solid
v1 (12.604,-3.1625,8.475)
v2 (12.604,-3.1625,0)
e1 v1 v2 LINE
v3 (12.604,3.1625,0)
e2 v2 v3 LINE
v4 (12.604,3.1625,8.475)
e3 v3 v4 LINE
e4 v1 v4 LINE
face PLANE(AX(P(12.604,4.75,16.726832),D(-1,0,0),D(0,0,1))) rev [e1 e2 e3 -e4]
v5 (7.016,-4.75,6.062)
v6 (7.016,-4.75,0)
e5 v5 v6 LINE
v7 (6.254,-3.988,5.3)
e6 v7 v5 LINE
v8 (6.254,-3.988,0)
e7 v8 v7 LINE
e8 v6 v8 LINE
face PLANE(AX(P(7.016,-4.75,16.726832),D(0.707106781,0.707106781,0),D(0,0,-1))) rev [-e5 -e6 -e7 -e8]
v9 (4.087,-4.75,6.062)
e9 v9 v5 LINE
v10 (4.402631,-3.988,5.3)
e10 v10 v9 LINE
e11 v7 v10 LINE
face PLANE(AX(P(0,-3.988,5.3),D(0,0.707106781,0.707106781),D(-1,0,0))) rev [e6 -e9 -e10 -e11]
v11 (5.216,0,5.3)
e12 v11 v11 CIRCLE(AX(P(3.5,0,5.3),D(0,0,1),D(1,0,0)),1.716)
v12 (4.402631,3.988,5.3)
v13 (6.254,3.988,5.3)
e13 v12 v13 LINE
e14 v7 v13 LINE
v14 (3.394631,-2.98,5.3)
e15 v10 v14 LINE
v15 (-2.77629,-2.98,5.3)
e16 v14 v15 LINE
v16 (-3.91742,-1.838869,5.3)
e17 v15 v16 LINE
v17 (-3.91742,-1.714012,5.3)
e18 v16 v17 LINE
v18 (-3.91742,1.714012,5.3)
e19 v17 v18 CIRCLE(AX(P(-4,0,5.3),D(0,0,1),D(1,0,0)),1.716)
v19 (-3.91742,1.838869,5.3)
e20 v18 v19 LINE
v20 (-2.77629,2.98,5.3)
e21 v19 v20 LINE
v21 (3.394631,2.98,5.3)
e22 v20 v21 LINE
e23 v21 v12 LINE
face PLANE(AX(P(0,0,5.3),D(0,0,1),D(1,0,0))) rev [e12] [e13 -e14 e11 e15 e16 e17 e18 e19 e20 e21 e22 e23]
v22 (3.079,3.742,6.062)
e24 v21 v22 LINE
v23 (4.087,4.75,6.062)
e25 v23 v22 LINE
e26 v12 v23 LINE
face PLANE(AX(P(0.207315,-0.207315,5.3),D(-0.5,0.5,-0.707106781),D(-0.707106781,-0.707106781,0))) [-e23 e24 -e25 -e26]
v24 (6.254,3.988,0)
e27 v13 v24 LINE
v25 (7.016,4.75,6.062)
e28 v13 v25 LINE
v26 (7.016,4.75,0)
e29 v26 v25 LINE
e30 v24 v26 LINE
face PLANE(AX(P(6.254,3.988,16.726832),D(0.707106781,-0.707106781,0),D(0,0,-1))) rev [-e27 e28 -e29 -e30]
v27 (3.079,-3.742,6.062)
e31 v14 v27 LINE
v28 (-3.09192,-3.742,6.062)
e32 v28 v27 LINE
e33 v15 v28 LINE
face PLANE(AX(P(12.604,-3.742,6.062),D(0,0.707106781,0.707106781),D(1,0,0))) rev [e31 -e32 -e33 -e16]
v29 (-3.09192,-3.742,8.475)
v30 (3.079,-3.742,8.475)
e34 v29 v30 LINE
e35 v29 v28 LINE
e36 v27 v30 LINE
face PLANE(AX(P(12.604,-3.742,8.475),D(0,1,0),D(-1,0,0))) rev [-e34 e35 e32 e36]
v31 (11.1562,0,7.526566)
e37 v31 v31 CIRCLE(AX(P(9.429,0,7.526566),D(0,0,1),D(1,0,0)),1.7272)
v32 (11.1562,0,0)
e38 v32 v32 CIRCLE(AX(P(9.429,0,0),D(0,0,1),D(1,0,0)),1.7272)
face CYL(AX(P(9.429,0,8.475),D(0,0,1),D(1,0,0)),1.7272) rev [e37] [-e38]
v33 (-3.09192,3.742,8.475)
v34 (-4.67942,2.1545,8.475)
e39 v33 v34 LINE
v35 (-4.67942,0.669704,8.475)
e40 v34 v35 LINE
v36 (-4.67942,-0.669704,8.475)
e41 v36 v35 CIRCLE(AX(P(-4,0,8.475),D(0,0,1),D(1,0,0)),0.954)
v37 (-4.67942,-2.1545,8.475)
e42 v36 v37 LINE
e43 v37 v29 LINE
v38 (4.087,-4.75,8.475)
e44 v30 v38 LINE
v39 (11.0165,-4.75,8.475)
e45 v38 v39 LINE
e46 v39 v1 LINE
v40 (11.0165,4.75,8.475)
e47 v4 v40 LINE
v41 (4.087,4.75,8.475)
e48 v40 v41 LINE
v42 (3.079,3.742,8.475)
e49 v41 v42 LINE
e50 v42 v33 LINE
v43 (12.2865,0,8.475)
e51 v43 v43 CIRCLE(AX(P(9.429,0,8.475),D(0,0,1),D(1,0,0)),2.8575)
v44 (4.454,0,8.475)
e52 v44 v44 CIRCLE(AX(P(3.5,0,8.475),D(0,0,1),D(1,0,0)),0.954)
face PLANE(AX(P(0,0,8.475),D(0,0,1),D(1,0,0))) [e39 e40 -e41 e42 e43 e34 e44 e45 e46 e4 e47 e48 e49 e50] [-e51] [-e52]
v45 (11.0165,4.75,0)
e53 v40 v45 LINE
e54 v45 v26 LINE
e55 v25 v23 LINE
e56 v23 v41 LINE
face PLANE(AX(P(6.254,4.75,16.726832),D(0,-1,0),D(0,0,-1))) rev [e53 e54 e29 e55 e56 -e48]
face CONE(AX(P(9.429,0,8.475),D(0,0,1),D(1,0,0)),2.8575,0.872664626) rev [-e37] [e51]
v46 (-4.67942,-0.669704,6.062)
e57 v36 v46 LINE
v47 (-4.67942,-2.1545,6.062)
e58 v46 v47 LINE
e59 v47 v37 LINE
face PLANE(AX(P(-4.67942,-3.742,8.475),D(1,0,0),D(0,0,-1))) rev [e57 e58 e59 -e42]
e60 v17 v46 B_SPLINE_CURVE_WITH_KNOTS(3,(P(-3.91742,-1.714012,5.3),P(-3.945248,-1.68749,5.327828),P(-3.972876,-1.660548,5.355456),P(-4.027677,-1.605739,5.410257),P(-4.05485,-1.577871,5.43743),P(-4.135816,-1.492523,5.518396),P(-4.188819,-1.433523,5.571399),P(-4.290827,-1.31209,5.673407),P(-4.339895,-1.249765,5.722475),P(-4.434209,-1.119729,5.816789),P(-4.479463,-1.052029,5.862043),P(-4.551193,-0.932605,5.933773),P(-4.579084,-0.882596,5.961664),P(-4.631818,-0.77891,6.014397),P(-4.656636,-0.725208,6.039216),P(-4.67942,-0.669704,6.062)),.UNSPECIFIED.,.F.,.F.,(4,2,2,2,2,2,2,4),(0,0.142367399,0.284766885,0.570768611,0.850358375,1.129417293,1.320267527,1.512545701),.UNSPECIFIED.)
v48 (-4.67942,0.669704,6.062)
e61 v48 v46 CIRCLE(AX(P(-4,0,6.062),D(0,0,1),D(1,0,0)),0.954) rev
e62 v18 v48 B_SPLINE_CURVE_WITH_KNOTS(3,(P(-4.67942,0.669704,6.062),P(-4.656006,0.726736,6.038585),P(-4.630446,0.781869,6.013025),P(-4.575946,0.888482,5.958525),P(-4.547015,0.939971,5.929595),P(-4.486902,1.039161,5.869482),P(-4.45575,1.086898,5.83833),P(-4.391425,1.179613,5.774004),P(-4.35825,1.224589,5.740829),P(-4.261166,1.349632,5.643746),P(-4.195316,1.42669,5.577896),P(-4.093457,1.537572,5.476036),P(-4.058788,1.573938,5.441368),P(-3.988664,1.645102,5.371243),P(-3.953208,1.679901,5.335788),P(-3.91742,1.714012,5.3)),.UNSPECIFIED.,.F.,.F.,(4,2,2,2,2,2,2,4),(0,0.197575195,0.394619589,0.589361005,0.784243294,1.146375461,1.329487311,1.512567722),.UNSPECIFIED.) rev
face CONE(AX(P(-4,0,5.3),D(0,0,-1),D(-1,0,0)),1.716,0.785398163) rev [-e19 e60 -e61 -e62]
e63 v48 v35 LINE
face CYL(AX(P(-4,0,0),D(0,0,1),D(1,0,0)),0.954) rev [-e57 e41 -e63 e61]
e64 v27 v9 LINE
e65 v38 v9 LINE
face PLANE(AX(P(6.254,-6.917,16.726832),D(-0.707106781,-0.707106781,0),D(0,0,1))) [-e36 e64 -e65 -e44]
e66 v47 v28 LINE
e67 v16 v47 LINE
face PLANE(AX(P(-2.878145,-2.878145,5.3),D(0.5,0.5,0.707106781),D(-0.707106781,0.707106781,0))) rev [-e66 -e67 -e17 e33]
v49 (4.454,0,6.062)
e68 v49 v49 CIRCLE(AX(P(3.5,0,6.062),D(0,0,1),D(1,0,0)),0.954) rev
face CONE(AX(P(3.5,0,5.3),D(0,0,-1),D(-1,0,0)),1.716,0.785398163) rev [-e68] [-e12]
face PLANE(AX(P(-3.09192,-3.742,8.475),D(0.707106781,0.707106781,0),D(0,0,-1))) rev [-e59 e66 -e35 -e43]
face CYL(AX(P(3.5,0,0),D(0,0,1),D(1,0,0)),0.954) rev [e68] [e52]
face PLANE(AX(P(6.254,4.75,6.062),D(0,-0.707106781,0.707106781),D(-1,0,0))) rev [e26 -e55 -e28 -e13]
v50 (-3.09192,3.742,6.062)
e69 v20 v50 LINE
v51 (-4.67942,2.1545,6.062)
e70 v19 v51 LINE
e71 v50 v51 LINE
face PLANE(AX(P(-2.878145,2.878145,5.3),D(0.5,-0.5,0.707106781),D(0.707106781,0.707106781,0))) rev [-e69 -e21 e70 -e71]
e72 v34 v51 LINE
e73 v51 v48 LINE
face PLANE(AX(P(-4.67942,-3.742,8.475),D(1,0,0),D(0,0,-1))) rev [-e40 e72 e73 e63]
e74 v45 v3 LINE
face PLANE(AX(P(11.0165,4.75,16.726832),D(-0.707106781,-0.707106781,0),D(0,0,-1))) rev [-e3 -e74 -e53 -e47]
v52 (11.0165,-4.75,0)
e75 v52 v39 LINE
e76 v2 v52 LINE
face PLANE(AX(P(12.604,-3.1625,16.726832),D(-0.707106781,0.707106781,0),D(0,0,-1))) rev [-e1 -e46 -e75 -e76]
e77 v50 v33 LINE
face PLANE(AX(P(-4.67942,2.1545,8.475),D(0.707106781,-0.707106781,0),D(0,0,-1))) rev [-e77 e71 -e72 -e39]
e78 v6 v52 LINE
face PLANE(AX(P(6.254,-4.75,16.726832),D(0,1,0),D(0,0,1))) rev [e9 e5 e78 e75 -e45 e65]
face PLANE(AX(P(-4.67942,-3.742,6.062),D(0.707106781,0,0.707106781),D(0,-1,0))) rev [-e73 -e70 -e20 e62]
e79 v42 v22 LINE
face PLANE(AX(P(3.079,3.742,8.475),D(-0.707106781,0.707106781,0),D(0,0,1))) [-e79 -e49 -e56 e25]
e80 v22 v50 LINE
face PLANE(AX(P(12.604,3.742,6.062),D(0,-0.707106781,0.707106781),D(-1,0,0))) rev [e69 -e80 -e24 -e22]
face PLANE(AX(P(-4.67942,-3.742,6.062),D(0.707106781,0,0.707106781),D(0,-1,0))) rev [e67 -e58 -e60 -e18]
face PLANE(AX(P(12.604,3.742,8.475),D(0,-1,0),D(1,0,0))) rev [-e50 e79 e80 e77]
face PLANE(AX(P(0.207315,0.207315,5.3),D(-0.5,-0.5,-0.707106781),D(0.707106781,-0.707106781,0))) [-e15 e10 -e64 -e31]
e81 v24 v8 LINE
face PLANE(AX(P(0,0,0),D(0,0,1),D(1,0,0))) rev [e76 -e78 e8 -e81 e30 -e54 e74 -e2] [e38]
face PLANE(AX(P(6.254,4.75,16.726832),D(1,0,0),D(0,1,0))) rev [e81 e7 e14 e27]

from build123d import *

# Parameters (mm, degrees)
SKETCH1_W                                         = 6.35
SKETCH1_H                                         = 9.5
BOSS_EXTRUDE1_DEPTH                               = 5.3
SKETCH2_W                                         = 17.283420288
SKETCH2_H                                         = 7.484
BOSS_EXTRUDE2_DEPTH                               = 3.175
SKETCH3_R                                         = 0.954
CUT_EXTRUDE1_DEPTH                                = 16.91379719
SKETCH4_W                                         = 6.35
SKETCH4_H                                         = 1.008
BOSS_EXTRUDE3_DEPTH                               = 3.175
CHAMFER1_SIZE                                     = 3.175
CHAMFER2_SIZE                                     = 1.5875
CHAMFER3_SIZE                                     = 0.762
CSK_FOR_4_FLAT_HEAD_MACHINE_SCREW_100_D           = 3.4544
CSK_FOR_4_FLAT_HEAD_MACHINE_SCREW_100_CSINK_D     = 5.715
CSK_FOR_4_FLAT_HEAD_MACHINE_SCREW_100_CSINK_ANGLE = 100


with BuildPart() as part:
    # Sketch1 → Boss-Extrude1 (new body)
    with BuildSketch(Plane.XY):
        with Locations((9.429, 0)):
            Rectangle(SKETCH1_W, SKETCH1_H)
    extrude(amount=BOSS_EXTRUDE1_DEPTH)

    # Sketch2 → Boss-Extrude2 (add)
    with BuildSketch(Plane.XY.offset(5.3)):
        with Locations((3.962289856, 0)):
            Rectangle(SKETCH2_W, SKETCH2_H)
    extrude(amount=BOSS_EXTRUDE2_DEPTH)

    # Sketch3 → Cut-Extrude1 (cut, through all)
    with BuildSketch(Plane.XY.offset(8.475)):
        with Locations((-4, 0)):
            Circle(SKETCH3_R)
        with Locations((3.5, 0)):
            Circle(SKETCH3_R)
    extrude(amount=-CUT_EXTRUDE1_DEPTH, mode=Mode.SUBTRACT)

    # Sketch4 → Boss-Extrude3 (add)
    with BuildSketch(Plane.XY.offset(5.3)):
        with Locations((9.429, 4.246)):
            Rectangle(SKETCH4_W, SKETCH4_H)
        with Locations((9.429, -4.246)):
            Rectangle(SKETCH4_W, SKETCH4_H)
    extrude(amount=BOSS_EXTRUDE3_DEPTH)

    # Chamfer1
    # the kernel refuses this chamfer: 3.175 mm, written as the material it adds along each edge
    with BuildSketch(Plane(origin=(6.254, 3.742, 5.3), x_dir=(-0.9996219169112968, -0.027495876610586466, 0), z_dir=(0, 0, 1))) as chamfer1_piece_1_section:
        Polygon((CHAMFER1_SIZE * 0.999621916911, -CHAMFER1_SIZE * 0.0274958766106), (-CHAMFER1_SIZE * 0.0274958766106, -CHAMFER1_SIZE * 0.999621916911), (0, 0), align=None)
    chamfer1_piece_1 = extrude(amount=3.175, mode=Mode.PRIVATE)
    chamfer1_piece_1 = split(chamfer1_piece_1, bisect_by=Plane(origin=(4.881200971, 4.75, 6.8875), z_dir=(0, -1, 0)), keep=Keep.TOP, mode=Mode.PRIVATE)
    add(chamfer1_piece_1)
    with BuildSketch(Plane(origin=(6.254, -3.742, 5.3), x_dir=(-0.9996219169112968, 0.027495876610586324, 0), z_dir=(0, 0, 1))) as chamfer1_piece_2_section:
        Polygon((CHAMFER1_SIZE * 0.999621916911, CHAMFER1_SIZE * 0.0274958766106), (-CHAMFER1_SIZE * 0.0274958766106, CHAMFER1_SIZE * 0.999621916911), (0, 0), align=None)
    chamfer1_piece_2 = extrude(amount=3.175, mode=Mode.PRIVATE)
    chamfer1_piece_2 = split(chamfer1_piece_2, bisect_by=Plane(origin=(4.881200971, -4.75, 6.8875), z_dir=(0, 1, 0)), keep=Keep.TOP, mode=Mode.PRIVATE)
    add(chamfer1_piece_2)

    # Chamfer2
    chamfer2_edges = [part.edges().sort_by_distance(p)[0] for p in [
        (12.604, 4.75, 4.2375),
        (12.604, -4.75, 4.2375),
        (-4.679420288, 3.742, 6.8875),
        (-4.679420288, -3.742, 6.8875),
    ]]
    chamfer(chamfer2_edges, length=CHAMFER2_SIZE)

    # Chamfer3
    chamfer3_edges = [part.edges().sort_by_distance(p)[0] for p in [
        (-0.006460144, -3.742, 5.3),
        (-4.679420288, 1.412102233, 5.3),
        (-3.885670288, 2.94825, 5.3),
        (-3.885670288, -2.94825, 5.3),
        (-4.679420288, -1.412102233, 5.3),
        (-3.046, 0, 5.3),
        (2.546, 0, 5.3),
        (-0.006460144, 3.742, 5.3),
        (6.254, -4.75, 2.65),
        (6.254, 4.75, 2.65),
        (3.583, 4.246, 5.3),
        (3.583, -4.246, 5.3),
        (5.1705, 4.75, 5.3),
        (5.1705, -4.75, 5.3),
    ]]
    chamfer(chamfer3_edges, length=CHAMFER3_SIZE)

    # CSK for #4 Flat Head Machine Screw (100)1 (through all)
    with Locations(Plane.XY.offset(8.475)):
        with Locations((9.429, 0)):
            CounterSinkHole(CSK_FOR_4_FLAT_HEAD_MACHINE_SCREW_100_D / 2, CSK_FOR_4_FLAT_HEAD_MACHINE_SCREW_100_CSINK_D / 2, counter_sink_angle=CSK_FOR_4_FLAT_HEAD_MACHINE_SCREW_100_CSINK_ANGLE)


solid = part.part
